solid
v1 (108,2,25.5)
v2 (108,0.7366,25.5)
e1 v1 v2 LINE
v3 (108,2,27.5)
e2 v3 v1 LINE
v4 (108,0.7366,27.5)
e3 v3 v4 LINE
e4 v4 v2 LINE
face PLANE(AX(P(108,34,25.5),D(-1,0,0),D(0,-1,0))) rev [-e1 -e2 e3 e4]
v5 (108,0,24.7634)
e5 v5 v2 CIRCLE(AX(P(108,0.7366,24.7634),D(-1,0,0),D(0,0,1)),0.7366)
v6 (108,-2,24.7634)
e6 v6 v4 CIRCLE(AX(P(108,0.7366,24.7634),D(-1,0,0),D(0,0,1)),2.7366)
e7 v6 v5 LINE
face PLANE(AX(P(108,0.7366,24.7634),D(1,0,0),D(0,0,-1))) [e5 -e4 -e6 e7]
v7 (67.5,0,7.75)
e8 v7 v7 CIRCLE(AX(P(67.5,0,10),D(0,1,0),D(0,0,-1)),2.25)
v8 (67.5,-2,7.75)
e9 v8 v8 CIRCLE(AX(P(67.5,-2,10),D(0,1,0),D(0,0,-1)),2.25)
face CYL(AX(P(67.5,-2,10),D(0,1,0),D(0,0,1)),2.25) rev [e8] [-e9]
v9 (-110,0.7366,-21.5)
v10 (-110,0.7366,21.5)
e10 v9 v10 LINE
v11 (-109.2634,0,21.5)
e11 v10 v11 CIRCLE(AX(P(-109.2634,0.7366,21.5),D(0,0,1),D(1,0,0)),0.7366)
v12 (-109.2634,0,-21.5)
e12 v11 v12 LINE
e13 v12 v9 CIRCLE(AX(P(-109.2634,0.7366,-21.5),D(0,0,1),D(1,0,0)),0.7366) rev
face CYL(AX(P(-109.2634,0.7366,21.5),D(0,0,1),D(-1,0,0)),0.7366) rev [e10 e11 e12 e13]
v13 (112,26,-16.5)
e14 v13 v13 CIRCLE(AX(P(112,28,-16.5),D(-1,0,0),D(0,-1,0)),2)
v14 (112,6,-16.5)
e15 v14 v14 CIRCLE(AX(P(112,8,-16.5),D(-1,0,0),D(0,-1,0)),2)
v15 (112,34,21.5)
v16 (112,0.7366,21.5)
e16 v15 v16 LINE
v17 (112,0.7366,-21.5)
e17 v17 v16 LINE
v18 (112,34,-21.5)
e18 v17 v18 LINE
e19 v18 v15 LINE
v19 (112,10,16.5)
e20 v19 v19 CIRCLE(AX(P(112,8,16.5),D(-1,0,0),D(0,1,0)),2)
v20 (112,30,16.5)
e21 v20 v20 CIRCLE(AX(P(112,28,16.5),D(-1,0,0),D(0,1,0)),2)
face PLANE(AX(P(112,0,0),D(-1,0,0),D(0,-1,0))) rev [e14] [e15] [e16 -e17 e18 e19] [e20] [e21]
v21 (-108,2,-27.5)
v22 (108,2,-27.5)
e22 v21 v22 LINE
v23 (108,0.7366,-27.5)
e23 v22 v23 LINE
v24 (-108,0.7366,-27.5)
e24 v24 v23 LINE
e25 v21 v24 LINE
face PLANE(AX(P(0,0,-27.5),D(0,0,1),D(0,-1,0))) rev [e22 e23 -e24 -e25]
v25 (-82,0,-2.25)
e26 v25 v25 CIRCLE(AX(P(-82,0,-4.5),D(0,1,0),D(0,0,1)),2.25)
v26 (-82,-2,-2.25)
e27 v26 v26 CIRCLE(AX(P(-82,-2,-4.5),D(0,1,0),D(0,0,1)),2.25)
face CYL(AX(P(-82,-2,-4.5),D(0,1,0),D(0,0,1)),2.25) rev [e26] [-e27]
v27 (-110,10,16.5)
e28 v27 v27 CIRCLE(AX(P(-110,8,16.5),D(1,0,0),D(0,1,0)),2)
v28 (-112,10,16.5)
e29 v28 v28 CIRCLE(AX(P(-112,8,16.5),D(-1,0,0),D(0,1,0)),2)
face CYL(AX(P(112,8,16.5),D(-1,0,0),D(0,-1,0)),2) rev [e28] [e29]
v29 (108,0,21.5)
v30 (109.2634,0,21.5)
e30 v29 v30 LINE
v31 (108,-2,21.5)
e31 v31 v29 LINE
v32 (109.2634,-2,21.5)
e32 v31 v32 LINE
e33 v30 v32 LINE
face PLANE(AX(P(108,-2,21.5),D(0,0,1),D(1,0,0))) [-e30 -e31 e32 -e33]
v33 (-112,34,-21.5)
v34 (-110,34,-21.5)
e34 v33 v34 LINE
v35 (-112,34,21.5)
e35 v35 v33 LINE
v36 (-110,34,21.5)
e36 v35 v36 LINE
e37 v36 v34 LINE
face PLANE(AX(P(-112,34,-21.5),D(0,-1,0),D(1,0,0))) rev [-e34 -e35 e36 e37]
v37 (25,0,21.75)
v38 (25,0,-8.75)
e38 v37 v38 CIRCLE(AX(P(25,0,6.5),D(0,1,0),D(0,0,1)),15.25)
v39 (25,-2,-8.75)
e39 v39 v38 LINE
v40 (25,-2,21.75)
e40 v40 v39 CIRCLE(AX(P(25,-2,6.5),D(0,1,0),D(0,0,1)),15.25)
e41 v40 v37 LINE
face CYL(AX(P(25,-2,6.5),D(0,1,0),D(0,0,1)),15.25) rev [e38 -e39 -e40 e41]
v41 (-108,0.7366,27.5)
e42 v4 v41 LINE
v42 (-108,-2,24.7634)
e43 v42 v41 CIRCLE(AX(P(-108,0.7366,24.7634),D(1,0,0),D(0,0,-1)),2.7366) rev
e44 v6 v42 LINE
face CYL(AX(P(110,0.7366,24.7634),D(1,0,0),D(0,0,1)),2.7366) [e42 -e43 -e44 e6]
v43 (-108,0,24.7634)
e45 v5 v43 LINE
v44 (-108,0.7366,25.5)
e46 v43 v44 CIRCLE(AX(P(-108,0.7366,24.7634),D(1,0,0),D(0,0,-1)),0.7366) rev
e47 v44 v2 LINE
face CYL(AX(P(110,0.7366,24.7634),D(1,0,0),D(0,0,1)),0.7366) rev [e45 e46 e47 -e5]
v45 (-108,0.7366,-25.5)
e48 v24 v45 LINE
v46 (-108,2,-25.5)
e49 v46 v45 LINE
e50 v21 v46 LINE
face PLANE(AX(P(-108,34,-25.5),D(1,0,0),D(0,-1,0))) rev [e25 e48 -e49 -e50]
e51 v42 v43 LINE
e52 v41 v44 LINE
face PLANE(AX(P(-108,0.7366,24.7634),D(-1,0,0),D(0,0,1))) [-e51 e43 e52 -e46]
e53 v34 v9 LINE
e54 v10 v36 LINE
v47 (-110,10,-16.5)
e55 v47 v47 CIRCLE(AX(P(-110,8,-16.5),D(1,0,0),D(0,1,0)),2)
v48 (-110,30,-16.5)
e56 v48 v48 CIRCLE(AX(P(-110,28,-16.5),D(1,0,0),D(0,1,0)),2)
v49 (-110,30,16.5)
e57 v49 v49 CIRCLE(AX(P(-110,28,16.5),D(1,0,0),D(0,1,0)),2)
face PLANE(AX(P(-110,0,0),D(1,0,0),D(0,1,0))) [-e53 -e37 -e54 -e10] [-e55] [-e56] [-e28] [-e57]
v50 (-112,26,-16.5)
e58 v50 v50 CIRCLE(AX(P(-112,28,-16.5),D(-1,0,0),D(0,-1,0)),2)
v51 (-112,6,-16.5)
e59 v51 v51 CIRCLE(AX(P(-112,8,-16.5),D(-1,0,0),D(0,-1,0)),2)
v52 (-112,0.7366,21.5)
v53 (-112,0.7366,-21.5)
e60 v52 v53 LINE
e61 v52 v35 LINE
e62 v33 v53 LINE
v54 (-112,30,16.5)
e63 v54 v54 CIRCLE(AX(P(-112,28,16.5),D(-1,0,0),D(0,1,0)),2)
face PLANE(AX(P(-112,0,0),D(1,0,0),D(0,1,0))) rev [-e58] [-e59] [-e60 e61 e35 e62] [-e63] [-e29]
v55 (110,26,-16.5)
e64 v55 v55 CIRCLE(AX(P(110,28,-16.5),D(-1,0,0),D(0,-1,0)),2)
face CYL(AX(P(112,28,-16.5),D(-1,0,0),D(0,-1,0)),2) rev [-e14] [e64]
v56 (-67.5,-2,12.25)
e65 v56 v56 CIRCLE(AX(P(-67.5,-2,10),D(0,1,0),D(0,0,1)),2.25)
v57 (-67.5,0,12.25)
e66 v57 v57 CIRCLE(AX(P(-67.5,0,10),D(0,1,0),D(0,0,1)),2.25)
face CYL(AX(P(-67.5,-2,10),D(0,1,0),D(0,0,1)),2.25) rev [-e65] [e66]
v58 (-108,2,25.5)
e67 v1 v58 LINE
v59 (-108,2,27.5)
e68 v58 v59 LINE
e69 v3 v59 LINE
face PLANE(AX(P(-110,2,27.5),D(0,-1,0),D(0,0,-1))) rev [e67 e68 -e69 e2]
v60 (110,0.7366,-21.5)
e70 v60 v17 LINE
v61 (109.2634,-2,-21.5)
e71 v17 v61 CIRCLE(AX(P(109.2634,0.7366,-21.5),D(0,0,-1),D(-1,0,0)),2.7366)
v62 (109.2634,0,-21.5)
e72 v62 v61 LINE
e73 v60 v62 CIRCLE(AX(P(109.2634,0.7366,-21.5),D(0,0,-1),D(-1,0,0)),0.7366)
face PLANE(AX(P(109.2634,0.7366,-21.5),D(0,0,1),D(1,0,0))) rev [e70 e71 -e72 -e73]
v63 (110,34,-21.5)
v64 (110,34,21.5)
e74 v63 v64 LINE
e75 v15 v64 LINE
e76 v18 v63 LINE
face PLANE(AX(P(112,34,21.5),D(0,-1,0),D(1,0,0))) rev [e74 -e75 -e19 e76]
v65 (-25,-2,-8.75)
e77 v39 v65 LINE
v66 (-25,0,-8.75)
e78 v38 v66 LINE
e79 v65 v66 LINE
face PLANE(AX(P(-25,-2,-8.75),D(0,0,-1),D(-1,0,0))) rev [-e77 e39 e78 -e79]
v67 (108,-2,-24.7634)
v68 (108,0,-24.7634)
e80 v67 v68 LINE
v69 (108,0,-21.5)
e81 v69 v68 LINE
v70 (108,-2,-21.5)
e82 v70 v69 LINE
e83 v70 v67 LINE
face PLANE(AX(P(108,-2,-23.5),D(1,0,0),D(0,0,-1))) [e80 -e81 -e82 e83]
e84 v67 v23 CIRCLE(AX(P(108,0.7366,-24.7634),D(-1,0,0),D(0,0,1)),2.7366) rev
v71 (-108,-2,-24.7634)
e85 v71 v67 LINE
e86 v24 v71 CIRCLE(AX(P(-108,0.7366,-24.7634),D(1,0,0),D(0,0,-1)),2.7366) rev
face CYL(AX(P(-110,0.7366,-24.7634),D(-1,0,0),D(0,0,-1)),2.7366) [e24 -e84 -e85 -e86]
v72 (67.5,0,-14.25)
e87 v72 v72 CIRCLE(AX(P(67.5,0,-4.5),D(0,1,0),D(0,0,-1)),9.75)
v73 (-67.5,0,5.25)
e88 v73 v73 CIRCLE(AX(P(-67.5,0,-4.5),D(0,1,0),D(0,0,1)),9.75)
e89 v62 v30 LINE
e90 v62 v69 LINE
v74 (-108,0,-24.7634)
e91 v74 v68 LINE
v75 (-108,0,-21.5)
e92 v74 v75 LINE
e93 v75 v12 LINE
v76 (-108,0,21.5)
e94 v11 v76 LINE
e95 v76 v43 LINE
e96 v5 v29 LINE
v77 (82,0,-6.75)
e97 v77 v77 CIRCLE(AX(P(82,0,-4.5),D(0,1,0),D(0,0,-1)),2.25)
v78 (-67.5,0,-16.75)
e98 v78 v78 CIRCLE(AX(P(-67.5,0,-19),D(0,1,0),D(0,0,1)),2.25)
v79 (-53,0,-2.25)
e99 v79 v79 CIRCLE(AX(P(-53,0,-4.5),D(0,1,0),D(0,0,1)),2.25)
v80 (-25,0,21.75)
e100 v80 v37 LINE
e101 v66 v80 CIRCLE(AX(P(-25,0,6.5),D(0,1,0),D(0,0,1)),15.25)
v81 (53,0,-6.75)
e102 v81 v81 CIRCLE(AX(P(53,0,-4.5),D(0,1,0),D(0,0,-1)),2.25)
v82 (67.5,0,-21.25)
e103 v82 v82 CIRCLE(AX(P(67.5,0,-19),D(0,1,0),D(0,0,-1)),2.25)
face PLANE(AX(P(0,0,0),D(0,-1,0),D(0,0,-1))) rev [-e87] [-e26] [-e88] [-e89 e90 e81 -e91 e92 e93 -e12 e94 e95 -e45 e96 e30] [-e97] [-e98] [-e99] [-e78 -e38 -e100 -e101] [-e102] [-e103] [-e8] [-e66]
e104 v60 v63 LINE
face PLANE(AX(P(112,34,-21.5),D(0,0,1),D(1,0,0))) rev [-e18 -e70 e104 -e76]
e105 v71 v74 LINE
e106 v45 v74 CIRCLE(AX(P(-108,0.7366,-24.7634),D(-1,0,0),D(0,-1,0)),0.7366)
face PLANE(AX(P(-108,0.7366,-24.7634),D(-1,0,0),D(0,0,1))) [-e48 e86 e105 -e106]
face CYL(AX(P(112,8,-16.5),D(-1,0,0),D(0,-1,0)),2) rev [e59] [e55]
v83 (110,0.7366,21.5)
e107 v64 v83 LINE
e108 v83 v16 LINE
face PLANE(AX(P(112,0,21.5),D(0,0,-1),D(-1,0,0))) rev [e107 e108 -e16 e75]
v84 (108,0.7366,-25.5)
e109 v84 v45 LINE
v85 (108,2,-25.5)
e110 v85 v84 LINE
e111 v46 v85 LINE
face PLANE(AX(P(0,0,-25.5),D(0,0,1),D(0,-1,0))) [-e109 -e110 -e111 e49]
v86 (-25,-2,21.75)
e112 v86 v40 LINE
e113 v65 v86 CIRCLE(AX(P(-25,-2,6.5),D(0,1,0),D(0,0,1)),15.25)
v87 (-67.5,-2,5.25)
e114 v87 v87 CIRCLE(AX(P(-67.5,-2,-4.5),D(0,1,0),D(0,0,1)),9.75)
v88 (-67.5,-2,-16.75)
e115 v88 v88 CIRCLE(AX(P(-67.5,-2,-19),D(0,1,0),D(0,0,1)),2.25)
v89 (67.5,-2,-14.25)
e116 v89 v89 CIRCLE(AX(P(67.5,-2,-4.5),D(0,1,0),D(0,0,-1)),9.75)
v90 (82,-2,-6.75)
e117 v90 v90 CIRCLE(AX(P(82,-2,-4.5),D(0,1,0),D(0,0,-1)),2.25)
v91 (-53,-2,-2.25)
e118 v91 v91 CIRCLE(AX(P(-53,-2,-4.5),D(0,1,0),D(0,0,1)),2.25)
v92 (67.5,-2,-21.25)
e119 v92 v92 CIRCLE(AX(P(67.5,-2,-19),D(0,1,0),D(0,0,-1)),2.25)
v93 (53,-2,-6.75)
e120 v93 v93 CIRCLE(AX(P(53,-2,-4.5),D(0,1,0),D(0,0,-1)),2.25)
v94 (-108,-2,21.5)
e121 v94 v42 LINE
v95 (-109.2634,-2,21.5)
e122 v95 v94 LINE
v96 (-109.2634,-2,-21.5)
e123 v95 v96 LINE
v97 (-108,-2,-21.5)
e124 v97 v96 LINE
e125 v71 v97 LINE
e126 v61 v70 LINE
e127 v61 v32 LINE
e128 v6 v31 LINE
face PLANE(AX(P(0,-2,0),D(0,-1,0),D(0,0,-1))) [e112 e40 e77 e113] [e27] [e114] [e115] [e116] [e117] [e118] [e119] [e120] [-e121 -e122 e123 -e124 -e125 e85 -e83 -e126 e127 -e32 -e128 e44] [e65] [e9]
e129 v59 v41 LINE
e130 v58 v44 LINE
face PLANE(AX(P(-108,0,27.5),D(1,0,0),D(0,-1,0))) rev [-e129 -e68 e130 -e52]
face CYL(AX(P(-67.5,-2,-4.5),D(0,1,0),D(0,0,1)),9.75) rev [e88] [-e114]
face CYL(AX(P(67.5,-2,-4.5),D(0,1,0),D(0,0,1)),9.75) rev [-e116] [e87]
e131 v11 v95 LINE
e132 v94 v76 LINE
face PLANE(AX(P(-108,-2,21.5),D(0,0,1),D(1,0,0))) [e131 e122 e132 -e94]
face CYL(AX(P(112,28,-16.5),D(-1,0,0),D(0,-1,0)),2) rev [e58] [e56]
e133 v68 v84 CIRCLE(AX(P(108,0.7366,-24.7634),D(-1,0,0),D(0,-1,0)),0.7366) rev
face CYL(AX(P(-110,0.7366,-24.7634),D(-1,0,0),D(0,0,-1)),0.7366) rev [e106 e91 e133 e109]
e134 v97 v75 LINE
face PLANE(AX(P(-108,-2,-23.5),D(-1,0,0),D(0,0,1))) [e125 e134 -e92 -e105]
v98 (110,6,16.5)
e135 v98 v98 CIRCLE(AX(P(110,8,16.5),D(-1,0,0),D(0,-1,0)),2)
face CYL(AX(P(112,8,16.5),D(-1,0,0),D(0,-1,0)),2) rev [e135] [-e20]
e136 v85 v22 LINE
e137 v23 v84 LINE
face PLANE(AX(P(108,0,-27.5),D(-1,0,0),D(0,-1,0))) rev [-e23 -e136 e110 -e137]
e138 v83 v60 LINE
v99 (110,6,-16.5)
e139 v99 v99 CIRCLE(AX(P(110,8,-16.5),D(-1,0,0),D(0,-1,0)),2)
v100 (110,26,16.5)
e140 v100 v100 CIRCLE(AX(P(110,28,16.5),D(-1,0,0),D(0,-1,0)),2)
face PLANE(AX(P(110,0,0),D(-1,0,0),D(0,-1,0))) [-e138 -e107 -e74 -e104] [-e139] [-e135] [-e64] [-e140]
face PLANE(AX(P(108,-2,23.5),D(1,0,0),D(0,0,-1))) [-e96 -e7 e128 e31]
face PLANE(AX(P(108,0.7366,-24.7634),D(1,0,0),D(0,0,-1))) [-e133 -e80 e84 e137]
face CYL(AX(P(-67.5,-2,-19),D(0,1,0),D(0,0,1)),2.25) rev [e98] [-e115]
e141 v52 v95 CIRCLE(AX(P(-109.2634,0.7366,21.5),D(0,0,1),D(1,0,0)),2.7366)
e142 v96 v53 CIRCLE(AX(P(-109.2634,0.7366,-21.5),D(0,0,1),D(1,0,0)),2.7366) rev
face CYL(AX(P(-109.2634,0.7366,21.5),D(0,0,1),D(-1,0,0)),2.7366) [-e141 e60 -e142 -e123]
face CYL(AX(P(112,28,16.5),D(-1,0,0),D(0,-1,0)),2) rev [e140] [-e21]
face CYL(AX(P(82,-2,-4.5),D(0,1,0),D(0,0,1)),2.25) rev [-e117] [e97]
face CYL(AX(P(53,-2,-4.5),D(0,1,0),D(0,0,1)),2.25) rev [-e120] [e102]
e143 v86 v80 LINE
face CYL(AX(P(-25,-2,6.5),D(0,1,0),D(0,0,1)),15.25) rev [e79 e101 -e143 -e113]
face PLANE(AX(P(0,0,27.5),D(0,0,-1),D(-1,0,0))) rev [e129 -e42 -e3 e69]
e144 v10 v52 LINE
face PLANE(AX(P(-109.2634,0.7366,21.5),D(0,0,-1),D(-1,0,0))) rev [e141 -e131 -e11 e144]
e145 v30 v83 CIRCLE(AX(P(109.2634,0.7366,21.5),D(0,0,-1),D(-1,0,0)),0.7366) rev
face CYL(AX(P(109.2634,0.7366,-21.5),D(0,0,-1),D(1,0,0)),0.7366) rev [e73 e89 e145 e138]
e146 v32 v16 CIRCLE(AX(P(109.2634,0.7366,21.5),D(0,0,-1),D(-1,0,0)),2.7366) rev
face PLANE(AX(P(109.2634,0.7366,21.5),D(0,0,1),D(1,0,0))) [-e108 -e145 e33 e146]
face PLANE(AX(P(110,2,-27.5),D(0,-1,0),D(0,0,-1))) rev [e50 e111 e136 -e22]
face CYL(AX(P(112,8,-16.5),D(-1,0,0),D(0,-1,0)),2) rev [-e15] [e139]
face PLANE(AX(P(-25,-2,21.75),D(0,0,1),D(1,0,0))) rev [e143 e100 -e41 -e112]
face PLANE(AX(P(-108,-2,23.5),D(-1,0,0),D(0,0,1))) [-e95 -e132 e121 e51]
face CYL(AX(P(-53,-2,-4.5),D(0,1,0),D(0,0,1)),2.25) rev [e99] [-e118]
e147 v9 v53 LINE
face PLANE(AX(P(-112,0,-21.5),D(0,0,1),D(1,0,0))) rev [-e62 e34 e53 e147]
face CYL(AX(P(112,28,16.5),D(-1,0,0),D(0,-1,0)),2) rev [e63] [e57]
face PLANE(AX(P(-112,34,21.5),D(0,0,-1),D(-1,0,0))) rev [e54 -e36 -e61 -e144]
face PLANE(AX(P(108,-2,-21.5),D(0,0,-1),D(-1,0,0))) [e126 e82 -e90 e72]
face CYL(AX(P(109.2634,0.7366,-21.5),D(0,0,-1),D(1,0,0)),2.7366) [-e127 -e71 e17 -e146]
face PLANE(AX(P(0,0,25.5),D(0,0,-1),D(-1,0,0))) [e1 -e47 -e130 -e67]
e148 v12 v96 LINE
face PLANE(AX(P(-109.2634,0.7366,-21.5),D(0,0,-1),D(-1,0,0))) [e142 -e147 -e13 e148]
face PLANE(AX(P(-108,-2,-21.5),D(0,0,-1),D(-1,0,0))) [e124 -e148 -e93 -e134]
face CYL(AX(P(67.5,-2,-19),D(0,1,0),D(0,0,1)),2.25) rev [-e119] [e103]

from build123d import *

# Parameters (mm, degrees)
BASE_FLANGE1_START             = -2
BASE_FLANGE1_OUTLINE_R         = 2.25
BASE_FLANGE1_OUTLINE_R_2       = 9.75
BASE_FLANGE1_DEPTH             = 2
EDGE_FLANGE1_STRIP_W           = 9.4732
EDGE_FLANGE1_STRIP_H           = 2
EDGE_FLANGE1_STRIP_CUT_DEPTH   = 220
EDGE_FLANGE1_STRIP_2_W         = 9.4732
EDGE_FLANGE1_STRIP_2_H         = 2
EDGE_FLANGE1_STRIP_CUT_2_DEPTH = 220
EDGE_FLANGE1_DEPTH             = 220
EDGE_FLANGE1_BEND_DEPTH        = 220
EDGE_FLANGE2_STRIP_W           = 9.4732
EDGE_FLANGE2_STRIP_H           = 2
EDGE_FLANGE2_STRIP_CUT_DEPTH   = 43
EDGE_FLANGE2_STRIP_2_W         = 9.4732
EDGE_FLANGE2_STRIP_2_H         = 2
EDGE_FLANGE2_STRIP_CUT_2_DEPTH = 43
EDGE_FLANGE2_DEPTH             = 43
EDGE_FLANGE2_BEND_DEPTH        = 43
SKETCH19_R                     = 2
CUT_EXTRUDE3_DEPTH             = 229.228503917
CUT_EXTRUDE4_DEPTH             = 121.814941129


# Read off the part's stored shape, not the designer's step: Base-Flange1
# Sheet-metal steps are written as plain solids
with BuildPart() as part:
    # Base-Flange1 outline → Base-Flange1 (new body)
    with BuildSketch(Plane(origin=(0, 0, 0), x_dir=(1, 0, 0), z_dir=(0, 1, 0)).offset(BASE_FLANGE1_START)):
        Polygon((108, 23.5), (110, 23.5), (110, 27.5), (-110, 27.5), (-110, 23.5), (-108, 23.5), (-108, 21.5), (-110, 21.5), (-110, -21.5), (-108, -21.5), (-108, -23.5), (-110, -23.5), (-110, -27.5), (110, -27.5), (110, -23.5), (108, -23.5), (108, -21.5), (110, -21.5), (110, 21.5), (108, 21.5), align=None)
        with Locations((-67.5, -10)):
            Circle(BASE_FLANGE1_OUTLINE_R, mode=Mode.SUBTRACT)
        with BuildLine():
            ThreePointArc((-25, -21.75), (-40.25, -6.5), (-25, 8.75))
            Line((-25, 8.75), (25, 8.75))
            ThreePointArc((25, 8.75), (40.25, -6.5), (25, -21.75))
            Line((25, -21.75), (-25, -21.75))
        make_face(mode=Mode.SUBTRACT)
        with Locations((67.5, -10)):
            Circle(BASE_FLANGE1_OUTLINE_R, mode=Mode.SUBTRACT)
        with Locations((-82, 4.5)):
            Circle(BASE_FLANGE1_OUTLINE_R, mode=Mode.SUBTRACT)
        with Locations((-67.5, 4.5)):
            Circle(BASE_FLANGE1_OUTLINE_R_2, mode=Mode.SUBTRACT)
        with Locations((-53, 4.5)):
            Circle(BASE_FLANGE1_OUTLINE_R, mode=Mode.SUBTRACT)
        with Locations((-67.5, 19)):
            Circle(BASE_FLANGE1_OUTLINE_R, mode=Mode.SUBTRACT)
        with Locations((53, 4.5)):
            Circle(BASE_FLANGE1_OUTLINE_R, mode=Mode.SUBTRACT)
        with Locations((67.5, 4.5)):
            Circle(BASE_FLANGE1_OUTLINE_R_2, mode=Mode.SUBTRACT)
        with Locations((82, 4.5)):
            Circle(BASE_FLANGE1_OUTLINE_R, mode=Mode.SUBTRACT)
        with Locations((67.5, 19)):
            Circle(BASE_FLANGE1_OUTLINE_R, mode=Mode.SUBTRACT)
    extrude(amount=BASE_FLANGE1_DEPTH)

    # Edge-Flange1 strip (across the edge) → Edge-Flange1 strip cut (cut)
    with BuildSketch(Plane(origin=(110, 0, -27.5), x_dir=(0, 0, 1), z_dir=(-1, 0, 0))):
        with Locations((-2, -1)):
            Rectangle(EDGE_FLANGE1_STRIP_W, EDGE_FLANGE1_STRIP_H)
    extrude(amount=EDGE_FLANGE1_STRIP_CUT_DEPTH, mode=Mode.SUBTRACT)

    # Edge-Flange1 strip 2 (across the edge) → Edge-Flange1 strip cut 2 (cut)
    with BuildSketch(Plane(origin=(-110, 0, 27.5), x_dir=(0, 0, -1), z_dir=(1, 0, 0))):
        with Locations((-2, -1)):
            Rectangle(EDGE_FLANGE1_STRIP_2_W, EDGE_FLANGE1_STRIP_2_H)
    extrude(amount=EDGE_FLANGE1_STRIP_CUT_2_DEPTH, mode=Mode.SUBTRACT)

    # Edge-Flange1 section (across the edge) → Edge-Flange1 (add)
    with BuildSketch(Plane(origin=(110, 0, -27.5), x_dir=(0, 0, 1), z_dir=(-1, 0, 0))):
        with BuildLine():
            Line((0, 0.7366), (0, 2))
            Line((0, 2), (2, 2))
            Line((2, 2), (2, 0.7366))
            ThreePointArc((2, 0.7366), (2.215745145, 0.215745145), (2.7366, 0))
            Line((2.7366, 0), (2.7366, -2))
            ThreePointArc((2.7366, -2), (0.801531583, -1.198468417), (0, 0.7366))
        make_face()
    extrude(amount=EDGE_FLANGE1_DEPTH)

    # Edge-Flange1 section 2 (across the edge) → Edge-Flange1 bend (add)
    with BuildSketch(Plane(origin=(-110, 0, 27.5), x_dir=(0, 0, -1), z_dir=(1, 0, 0))):
        with BuildLine():
            Line((0, 0.7366), (0, 2))
            Line((0, 2), (2, 2))
            Line((2, 2), (2, 0.7366))
            ThreePointArc((2, 0.7366), (2.215745145, 0.215745145), (2.7366, 0))
            Line((2.7366, 0), (2.7366, -2))
            ThreePointArc((2.7366, -2), (0.801531583, -1.198468417), (0, 0.7366))
        make_face()
    extrude(amount=EDGE_FLANGE1_BEND_DEPTH)

    # Edge-Flange2 strip (across the edge) → Edge-Flange2 strip cut (cut)
    with BuildSketch(Plane(origin=(-110, 0, -21.5), x_dir=(1, 0, 0), z_dir=(0, 0, 1))):
        with Locations((-4, -1)):
            Rectangle(EDGE_FLANGE2_STRIP_W, EDGE_FLANGE2_STRIP_H)
    extrude(amount=EDGE_FLANGE2_STRIP_CUT_DEPTH, mode=Mode.SUBTRACT)

    # Edge-Flange2 strip 2 (across the edge) → Edge-Flange2 strip cut 2 (cut)
    with BuildSketch(Plane(origin=(110, 0, 21.5), x_dir=(-1, 0, 0), z_dir=(0, 0, -1))):
        with Locations((-4, -1)):
            Rectangle(EDGE_FLANGE2_STRIP_2_W, EDGE_FLANGE2_STRIP_2_H)
    extrude(amount=EDGE_FLANGE2_STRIP_CUT_2_DEPTH, mode=Mode.SUBTRACT)

    # Edge-Flange2 section (across the edge) → Edge-Flange2 (add)
    with BuildSketch(Plane(origin=(-110, 0, -21.5), x_dir=(1, 0, 0), z_dir=(0, 0, 1))):
        with BuildLine():
            Line((-2, 0.7366), (-2, 34))
            Line((-2, 34), (0, 34))
            Line((0, 34), (0, 0.7366))
            ThreePointArc((0, 0.7366), (0.215745145, 0.215745145), (0.7366, 0))
            Line((0.7366, 0), (0.7366, -2))
            ThreePointArc((0.7366, -2), (-1.198468417, -1.198468417), (-2, 0.7366))
        make_face()
    extrude(amount=EDGE_FLANGE2_DEPTH)

    # Edge-Flange2 section 2 (across the edge) → Edge-Flange2 bend (add)
    with BuildSketch(Plane(origin=(110, 0, 21.5), x_dir=(-1, 0, 0), z_dir=(0, 0, -1))):
        with BuildLine():
            Line((-2, 0.7366), (-2, 34))
            Line((-2, 34), (0, 34))
            Line((0, 34), (0, 0.7366))
            ThreePointArc((0, 0.7366), (0.215745145, 0.215745145), (0.7366, 0))
            Line((0.7366, 0), (0.7366, -2))
            ThreePointArc((0.7366, -2), (-1.198468417, -1.198468417), (-2, 0.7366))
        make_face()
    extrude(amount=EDGE_FLANGE2_BEND_DEPTH)

    # Sketch19 → Cut-Extrude3 (cut, through all)
    with BuildSketch(Plane.ZY.offset(112)):
        with Locations(Location((-16.5, 28, 0), (0, 0, 270))):
            Circle(SKETCH19_R)
        with Locations(Location((-16.5, 8, 0), (0, 0, 270))):
            Circle(SKETCH19_R)
        with Locations(Location((16.5, 8, 0), (0, 0, 270))):
            Circle(SKETCH19_R)
        with Locations(Location((16.5, 28, 0), (0, 0, 270))):
            Circle(SKETCH19_R)
    extrude(amount=-CUT_EXTRUDE3_DEPTH, mode=Mode.SUBTRACT)

    # Sketch22 → Cut-Extrude4 (cut, through all)
    with BuildSketch(Plane.XZ.offset(2)):
        Polygon((-108, 23.5), (-110, 23.5), (-110, 24.7634), (-110, 27.5), (-108, 27.5), align=None)
        Polygon((-108, -23.5), (-108, -27.5), (-110, -27.5), (-110, -24.7634), (-110, -23.5), align=None)
        Polygon((108, -23.5), (110, -23.5), (110, -24.7634), (110, -27.5), (108, -27.5), align=None)
        Polygon((108, 23.5), (108, 27.5), (110, 27.5), (110, 24.7634), (110, 23.5), align=None)
    extrude(amount=-CUT_EXTRUDE4_DEPTH, mode=Mode.SUBTRACT)


solid = part.part
